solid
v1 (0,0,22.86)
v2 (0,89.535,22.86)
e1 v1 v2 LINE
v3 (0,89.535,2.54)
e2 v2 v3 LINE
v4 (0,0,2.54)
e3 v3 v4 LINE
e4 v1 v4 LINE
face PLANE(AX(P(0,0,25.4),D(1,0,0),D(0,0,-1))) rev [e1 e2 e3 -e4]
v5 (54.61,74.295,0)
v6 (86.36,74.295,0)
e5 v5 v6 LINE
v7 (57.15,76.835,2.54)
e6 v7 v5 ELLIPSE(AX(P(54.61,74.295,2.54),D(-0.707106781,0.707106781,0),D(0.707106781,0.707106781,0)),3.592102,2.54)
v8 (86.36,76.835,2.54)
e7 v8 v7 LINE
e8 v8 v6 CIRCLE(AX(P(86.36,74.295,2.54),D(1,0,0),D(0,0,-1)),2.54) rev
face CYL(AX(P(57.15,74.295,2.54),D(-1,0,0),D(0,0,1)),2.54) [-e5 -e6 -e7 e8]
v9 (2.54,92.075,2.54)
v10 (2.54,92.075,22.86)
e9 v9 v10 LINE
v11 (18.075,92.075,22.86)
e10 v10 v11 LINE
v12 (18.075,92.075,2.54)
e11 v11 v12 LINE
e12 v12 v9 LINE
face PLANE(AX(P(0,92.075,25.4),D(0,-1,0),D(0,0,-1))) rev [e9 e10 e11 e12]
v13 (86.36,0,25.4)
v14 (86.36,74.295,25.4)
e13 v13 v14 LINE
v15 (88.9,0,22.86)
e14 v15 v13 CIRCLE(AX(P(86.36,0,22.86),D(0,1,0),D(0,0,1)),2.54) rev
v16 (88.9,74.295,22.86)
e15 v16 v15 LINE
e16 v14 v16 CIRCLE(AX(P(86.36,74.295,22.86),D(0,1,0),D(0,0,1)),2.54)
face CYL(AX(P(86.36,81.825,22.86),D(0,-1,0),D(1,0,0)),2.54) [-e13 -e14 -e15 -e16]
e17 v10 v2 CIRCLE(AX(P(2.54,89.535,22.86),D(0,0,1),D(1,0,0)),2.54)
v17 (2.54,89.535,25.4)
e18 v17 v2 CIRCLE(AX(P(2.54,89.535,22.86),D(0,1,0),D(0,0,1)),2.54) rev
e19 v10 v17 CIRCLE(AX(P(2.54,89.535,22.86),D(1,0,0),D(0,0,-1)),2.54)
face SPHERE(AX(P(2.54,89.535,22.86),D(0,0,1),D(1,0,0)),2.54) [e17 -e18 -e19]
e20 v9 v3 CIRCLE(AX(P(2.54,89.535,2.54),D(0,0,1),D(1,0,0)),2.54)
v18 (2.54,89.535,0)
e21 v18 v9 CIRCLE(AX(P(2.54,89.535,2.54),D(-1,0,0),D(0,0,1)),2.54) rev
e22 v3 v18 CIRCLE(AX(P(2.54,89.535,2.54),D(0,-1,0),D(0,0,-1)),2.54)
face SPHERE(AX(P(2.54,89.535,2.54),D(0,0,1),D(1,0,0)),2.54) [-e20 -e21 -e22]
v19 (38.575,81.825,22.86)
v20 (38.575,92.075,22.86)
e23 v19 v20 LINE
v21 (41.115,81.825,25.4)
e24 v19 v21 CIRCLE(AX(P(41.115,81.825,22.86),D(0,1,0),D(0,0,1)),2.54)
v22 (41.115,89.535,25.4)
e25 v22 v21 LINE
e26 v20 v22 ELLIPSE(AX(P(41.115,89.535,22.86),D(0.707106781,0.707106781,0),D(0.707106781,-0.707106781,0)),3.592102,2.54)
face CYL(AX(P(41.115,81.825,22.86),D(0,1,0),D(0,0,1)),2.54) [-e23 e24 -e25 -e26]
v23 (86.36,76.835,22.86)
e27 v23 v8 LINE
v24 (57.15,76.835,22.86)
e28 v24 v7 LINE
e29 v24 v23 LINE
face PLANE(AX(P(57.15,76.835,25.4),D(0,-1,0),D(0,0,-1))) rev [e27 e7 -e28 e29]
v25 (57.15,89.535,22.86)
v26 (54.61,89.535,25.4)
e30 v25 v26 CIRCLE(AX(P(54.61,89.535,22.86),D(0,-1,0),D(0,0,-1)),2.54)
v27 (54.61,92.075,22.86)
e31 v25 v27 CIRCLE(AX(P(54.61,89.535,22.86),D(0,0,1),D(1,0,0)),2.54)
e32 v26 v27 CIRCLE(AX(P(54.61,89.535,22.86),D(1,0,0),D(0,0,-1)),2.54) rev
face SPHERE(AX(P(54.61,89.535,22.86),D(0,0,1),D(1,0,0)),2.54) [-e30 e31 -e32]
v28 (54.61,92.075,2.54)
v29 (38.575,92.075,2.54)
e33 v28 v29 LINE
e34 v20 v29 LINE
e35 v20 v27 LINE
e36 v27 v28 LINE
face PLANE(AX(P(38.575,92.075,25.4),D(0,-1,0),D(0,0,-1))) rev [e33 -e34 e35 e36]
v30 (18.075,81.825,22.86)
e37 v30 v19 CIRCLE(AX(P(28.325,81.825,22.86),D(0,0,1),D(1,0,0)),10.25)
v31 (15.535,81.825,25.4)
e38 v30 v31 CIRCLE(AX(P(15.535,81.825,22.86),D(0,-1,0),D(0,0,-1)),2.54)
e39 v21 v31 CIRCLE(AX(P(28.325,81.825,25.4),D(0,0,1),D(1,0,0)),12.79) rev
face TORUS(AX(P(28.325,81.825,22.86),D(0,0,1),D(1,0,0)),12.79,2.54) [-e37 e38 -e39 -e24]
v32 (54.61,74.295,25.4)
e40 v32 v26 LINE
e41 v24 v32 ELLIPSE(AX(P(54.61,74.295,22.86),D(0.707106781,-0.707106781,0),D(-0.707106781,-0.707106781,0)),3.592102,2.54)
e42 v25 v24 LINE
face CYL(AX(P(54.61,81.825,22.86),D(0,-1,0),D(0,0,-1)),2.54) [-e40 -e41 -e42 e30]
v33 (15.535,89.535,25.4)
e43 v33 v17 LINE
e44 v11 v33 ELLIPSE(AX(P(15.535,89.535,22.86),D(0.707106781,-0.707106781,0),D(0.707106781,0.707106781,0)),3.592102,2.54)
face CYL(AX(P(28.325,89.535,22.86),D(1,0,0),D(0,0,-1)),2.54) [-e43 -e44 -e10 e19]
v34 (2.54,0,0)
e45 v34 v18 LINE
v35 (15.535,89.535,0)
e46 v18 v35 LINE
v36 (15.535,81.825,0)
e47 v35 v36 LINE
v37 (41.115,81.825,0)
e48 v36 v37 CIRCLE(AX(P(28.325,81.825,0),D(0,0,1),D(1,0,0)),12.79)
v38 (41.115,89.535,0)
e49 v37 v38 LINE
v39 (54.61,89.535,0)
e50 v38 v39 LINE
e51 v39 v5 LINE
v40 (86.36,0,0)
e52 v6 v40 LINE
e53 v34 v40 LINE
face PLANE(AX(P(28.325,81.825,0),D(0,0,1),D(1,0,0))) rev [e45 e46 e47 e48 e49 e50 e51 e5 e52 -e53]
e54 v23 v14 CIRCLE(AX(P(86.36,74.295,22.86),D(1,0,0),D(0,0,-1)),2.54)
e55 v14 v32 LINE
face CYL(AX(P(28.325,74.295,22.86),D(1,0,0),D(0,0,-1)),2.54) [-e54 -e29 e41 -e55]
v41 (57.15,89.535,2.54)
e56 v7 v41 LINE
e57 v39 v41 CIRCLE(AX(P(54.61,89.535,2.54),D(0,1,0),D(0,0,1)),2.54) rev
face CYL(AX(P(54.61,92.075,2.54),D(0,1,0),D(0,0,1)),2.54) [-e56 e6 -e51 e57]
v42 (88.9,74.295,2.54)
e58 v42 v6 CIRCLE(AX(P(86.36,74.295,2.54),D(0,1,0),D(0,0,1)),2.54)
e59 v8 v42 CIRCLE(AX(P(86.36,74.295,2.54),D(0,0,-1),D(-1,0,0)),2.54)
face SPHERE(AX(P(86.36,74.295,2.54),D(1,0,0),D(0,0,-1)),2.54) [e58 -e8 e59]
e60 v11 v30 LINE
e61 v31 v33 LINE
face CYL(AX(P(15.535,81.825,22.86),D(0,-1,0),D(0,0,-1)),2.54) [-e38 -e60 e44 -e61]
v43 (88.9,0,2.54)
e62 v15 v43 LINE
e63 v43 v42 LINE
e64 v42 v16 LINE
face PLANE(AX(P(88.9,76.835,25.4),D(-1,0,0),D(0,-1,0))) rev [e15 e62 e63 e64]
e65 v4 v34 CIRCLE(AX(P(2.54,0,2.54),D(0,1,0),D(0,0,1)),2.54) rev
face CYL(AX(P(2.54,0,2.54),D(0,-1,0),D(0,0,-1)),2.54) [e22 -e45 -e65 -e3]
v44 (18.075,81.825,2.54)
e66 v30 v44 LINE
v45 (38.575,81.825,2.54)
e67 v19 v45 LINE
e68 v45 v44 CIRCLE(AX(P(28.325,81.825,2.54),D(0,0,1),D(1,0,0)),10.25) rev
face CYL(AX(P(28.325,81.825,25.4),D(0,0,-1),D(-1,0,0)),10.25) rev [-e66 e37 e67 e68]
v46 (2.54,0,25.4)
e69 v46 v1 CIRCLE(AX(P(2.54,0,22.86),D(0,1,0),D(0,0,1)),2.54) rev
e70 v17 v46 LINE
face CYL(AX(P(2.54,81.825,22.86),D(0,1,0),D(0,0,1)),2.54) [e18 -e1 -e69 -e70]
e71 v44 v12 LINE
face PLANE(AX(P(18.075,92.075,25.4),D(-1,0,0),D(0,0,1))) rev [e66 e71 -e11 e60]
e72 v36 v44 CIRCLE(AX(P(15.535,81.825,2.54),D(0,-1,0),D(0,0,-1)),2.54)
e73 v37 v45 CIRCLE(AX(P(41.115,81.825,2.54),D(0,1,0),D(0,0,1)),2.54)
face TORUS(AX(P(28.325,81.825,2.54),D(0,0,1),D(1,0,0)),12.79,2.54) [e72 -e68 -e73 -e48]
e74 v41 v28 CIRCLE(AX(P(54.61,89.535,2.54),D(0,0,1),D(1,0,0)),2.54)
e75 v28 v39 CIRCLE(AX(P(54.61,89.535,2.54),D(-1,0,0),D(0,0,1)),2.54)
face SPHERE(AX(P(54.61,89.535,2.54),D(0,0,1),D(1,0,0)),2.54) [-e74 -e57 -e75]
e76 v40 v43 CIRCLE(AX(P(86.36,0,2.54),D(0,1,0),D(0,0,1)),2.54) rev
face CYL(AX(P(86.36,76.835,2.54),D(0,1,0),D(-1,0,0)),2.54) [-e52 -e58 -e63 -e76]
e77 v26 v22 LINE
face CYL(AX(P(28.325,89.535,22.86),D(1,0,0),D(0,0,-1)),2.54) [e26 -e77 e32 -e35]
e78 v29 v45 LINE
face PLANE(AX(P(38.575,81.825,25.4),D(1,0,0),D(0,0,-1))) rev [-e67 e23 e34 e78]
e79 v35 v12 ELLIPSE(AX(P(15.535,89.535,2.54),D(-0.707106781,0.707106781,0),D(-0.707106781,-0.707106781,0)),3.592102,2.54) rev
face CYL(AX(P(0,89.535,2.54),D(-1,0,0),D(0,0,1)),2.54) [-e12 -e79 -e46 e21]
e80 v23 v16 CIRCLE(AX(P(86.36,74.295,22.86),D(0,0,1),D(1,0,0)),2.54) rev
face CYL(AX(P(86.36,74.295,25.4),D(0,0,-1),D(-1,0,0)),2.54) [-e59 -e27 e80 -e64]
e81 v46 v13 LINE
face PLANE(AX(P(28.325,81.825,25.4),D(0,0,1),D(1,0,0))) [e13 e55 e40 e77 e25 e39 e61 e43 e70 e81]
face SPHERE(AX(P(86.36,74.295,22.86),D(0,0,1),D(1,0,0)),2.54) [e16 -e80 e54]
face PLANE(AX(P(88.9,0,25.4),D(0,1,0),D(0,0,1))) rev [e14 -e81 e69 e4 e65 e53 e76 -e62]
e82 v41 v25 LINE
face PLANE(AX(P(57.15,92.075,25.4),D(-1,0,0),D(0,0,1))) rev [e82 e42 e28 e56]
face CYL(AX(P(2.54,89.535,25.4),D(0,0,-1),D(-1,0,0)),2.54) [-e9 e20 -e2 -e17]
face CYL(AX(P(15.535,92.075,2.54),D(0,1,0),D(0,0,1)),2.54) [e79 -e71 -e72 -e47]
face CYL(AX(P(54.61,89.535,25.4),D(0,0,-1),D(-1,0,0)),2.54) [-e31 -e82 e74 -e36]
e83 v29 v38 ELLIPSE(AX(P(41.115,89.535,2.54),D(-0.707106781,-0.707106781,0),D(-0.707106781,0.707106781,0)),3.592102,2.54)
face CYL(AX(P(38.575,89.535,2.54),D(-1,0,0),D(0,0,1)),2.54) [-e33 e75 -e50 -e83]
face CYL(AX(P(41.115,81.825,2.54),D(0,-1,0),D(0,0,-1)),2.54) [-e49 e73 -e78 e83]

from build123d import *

# Parameters (mm, degrees)
BOSS_EXTRUDE1_DEPTH = 25.4
FILLET4_R           = 2.54
FILLET5_R           = 2.54


with BuildPart() as part:
    # Sketch2 → Boss-Extrude1 (new body)
    with BuildSketch(Plane.XY):
        with BuildLine():
            Line((0, 0), (0, 92.075))
            Line((0, 92.075), (18.075, 92.075))
            Line((18.075, 92.075), (18.075, 81.825))
            ThreePointArc((18.075, 81.825), (28.325, 71.575), (38.575, 81.825))
            Line((38.575, 81.825), (38.575, 92.075))
            Line((38.575, 92.075), (57.15, 92.075))
            Line((57.15, 92.075), (57.15, 76.835))
            Line((57.15, 76.835), (88.9, 76.835))
            Line((88.9, 76.835), (88.9, 0))
            Line((88.9, 0), (0, 0))
        make_face()
    extrude(amount=BOSS_EXTRUDE1_DEPTH)

    # Fillet4
    fillet4_edges = [part.edges().sort_by_distance(p)[0] for p in [
        (0, 46.0375, 0),
        (9.0375, 92.075, 0),
        (18.075, 86.95, 0),
        (28.325, 71.575, 0),
        (38.575, 86.95, 0),
        (47.8625, 92.075, 0),
        (57.15, 84.455, 0),
        (73.025, 76.835, 25.4),
        (73.025, 76.835, 0),
        (88.9, 38.4175, 0),
        (57.15, 84.455, 25.4),
        (88.9, 76.835, 12.7),
        (47.8625, 92.075, 25.4),
        (38.575, 86.95, 25.4),
        (28.325, 71.575, 25.4),
        (18.075, 86.95, 25.4),
        (9.0375, 92.075, 25.4),
        (0, 46.0375, 25.4),
        (88.9, 38.4175, 25.4),
    ]]
    fillet(fillet4_edges, radius=FILLET4_R)

    # Fillet5
    # the kernel refuses this fillet: 2.54 mm, written as the material it takes off along each edge
    with BuildSketch(Plane(origin=(2.54, 89.535, 22.86), x_dir=(0, 1, 0), z_dir=(-1, 0, 0))) as fillet5_piece_1_section:
        Polygon((0, 0), (FILLET5_R, 0), (FILLET5_R, -FILLET5_R), (0, -FILLET5_R), align=None)
    fillet5_piece_1 = extrude(amount=FILLET5_R, mode=Mode.PRIVATE)
    fillet5_piece_1 = fillet5_piece_1 - Plane(origin=(2.54, 89.535, 22.86), x_dir=(0, -0.7071067811865475, -0.7071067811865475), z_dir=(-1, 0, 0)) * Sphere(FILLET5_R, mode=Mode.PRIVATE)
    add(fillet5_piece_1, mode=Mode.SUBTRACT)
    with BuildSketch(Plane(origin=(54.61, 89.535, 22.86), x_dir=(0, 1, 0), z_dir=(1, 0, 0))) as fillet5_piece_2_section:
        Polygon((0, 0), (FILLET5_R, 0), (FILLET5_R, FILLET5_R), (0, FILLET5_R), align=None)
    fillet5_piece_2 = extrude(amount=FILLET5_R, mode=Mode.PRIVATE)
    fillet5_piece_2 = fillet5_piece_2 - Plane(origin=(54.61, 89.535, 22.86), x_dir=(0, -0.7071067811865475, -0.7071067811865475), z_dir=(1, 0, 0)) * Sphere(FILLET5_R, mode=Mode.PRIVATE)
    add(fillet5_piece_2, mode=Mode.SUBTRACT)
    with BuildSketch(Plane(origin=(2.54, 89.535, 2.54), x_dir=(0, 1, 0), z_dir=(-1, 0, 0))) as fillet5_piece_3_section:
        Polygon((0, 0), (FILLET5_R, 0), (FILLET5_R, FILLET5_R), (0, FILLET5_R), align=None)
    fillet5_piece_3 = extrude(amount=FILLET5_R, mode=Mode.PRIVATE)
    fillet5_piece_3 = fillet5_piece_3 - Plane(origin=(2.54, 89.535, 2.54), x_dir=(0, -0.7071067811865475, 0.7071067811865475), z_dir=(-1, 0, 0)) * Sphere(FILLET5_R, mode=Mode.PRIVATE)
    add(fillet5_piece_3, mode=Mode.SUBTRACT)
    with BuildSketch(Plane(origin=(54.61, 89.535, 2.54), x_dir=(0, 1, 0), z_dir=(1, 0, 0))) as fillet5_piece_4_section:
        Polygon((0, 0), (FILLET5_R, 0), (FILLET5_R, -FILLET5_R), (0, -FILLET5_R), align=None)
    fillet5_piece_4 = extrude(amount=FILLET5_R, mode=Mode.PRIVATE)
    fillet5_piece_4 = fillet5_piece_4 - Plane(origin=(54.61, 89.535, 2.54), x_dir=(0, -0.7071067811865475, 0.7071067811865475), z_dir=(1, 0, 0)) * Sphere(FILLET5_R, mode=Mode.PRIVATE)
    add(fillet5_piece_4, mode=Mode.SUBTRACT)
    with BuildSketch(Plane(origin=(0, 92.075, 2.54), x_dir=(0, -1, 0), z_dir=(0, 0, 1))) as fillet5_piece_5:
        with BuildLine():
            CenterArc((FILLET5_R, FILLET5_R), FILLET5_R, 180, 90)
            Line((0, FILLET5_R), (0, 0))
            Line((0, 0), (FILLET5_R, 0))
        make_face()
    extrude(amount=20.32, mode=Mode.SUBTRACT)
    with BuildSketch(Plane(origin=(57.15, 92.075, 2.54), x_dir=(0, -1, 0), z_dir=(0, 0, 1))) as fillet5_piece_6:
        with BuildLine():
            CenterArc((FILLET5_R, -FILLET5_R), FILLET5_R, 90, 90)
            Line((0, -FILLET5_R), (0, 0))
            Line((0, 0), (FILLET5_R, 0))
        make_face()
    extrude(amount=20.32, mode=Mode.SUBTRACT)


solid = part.part
